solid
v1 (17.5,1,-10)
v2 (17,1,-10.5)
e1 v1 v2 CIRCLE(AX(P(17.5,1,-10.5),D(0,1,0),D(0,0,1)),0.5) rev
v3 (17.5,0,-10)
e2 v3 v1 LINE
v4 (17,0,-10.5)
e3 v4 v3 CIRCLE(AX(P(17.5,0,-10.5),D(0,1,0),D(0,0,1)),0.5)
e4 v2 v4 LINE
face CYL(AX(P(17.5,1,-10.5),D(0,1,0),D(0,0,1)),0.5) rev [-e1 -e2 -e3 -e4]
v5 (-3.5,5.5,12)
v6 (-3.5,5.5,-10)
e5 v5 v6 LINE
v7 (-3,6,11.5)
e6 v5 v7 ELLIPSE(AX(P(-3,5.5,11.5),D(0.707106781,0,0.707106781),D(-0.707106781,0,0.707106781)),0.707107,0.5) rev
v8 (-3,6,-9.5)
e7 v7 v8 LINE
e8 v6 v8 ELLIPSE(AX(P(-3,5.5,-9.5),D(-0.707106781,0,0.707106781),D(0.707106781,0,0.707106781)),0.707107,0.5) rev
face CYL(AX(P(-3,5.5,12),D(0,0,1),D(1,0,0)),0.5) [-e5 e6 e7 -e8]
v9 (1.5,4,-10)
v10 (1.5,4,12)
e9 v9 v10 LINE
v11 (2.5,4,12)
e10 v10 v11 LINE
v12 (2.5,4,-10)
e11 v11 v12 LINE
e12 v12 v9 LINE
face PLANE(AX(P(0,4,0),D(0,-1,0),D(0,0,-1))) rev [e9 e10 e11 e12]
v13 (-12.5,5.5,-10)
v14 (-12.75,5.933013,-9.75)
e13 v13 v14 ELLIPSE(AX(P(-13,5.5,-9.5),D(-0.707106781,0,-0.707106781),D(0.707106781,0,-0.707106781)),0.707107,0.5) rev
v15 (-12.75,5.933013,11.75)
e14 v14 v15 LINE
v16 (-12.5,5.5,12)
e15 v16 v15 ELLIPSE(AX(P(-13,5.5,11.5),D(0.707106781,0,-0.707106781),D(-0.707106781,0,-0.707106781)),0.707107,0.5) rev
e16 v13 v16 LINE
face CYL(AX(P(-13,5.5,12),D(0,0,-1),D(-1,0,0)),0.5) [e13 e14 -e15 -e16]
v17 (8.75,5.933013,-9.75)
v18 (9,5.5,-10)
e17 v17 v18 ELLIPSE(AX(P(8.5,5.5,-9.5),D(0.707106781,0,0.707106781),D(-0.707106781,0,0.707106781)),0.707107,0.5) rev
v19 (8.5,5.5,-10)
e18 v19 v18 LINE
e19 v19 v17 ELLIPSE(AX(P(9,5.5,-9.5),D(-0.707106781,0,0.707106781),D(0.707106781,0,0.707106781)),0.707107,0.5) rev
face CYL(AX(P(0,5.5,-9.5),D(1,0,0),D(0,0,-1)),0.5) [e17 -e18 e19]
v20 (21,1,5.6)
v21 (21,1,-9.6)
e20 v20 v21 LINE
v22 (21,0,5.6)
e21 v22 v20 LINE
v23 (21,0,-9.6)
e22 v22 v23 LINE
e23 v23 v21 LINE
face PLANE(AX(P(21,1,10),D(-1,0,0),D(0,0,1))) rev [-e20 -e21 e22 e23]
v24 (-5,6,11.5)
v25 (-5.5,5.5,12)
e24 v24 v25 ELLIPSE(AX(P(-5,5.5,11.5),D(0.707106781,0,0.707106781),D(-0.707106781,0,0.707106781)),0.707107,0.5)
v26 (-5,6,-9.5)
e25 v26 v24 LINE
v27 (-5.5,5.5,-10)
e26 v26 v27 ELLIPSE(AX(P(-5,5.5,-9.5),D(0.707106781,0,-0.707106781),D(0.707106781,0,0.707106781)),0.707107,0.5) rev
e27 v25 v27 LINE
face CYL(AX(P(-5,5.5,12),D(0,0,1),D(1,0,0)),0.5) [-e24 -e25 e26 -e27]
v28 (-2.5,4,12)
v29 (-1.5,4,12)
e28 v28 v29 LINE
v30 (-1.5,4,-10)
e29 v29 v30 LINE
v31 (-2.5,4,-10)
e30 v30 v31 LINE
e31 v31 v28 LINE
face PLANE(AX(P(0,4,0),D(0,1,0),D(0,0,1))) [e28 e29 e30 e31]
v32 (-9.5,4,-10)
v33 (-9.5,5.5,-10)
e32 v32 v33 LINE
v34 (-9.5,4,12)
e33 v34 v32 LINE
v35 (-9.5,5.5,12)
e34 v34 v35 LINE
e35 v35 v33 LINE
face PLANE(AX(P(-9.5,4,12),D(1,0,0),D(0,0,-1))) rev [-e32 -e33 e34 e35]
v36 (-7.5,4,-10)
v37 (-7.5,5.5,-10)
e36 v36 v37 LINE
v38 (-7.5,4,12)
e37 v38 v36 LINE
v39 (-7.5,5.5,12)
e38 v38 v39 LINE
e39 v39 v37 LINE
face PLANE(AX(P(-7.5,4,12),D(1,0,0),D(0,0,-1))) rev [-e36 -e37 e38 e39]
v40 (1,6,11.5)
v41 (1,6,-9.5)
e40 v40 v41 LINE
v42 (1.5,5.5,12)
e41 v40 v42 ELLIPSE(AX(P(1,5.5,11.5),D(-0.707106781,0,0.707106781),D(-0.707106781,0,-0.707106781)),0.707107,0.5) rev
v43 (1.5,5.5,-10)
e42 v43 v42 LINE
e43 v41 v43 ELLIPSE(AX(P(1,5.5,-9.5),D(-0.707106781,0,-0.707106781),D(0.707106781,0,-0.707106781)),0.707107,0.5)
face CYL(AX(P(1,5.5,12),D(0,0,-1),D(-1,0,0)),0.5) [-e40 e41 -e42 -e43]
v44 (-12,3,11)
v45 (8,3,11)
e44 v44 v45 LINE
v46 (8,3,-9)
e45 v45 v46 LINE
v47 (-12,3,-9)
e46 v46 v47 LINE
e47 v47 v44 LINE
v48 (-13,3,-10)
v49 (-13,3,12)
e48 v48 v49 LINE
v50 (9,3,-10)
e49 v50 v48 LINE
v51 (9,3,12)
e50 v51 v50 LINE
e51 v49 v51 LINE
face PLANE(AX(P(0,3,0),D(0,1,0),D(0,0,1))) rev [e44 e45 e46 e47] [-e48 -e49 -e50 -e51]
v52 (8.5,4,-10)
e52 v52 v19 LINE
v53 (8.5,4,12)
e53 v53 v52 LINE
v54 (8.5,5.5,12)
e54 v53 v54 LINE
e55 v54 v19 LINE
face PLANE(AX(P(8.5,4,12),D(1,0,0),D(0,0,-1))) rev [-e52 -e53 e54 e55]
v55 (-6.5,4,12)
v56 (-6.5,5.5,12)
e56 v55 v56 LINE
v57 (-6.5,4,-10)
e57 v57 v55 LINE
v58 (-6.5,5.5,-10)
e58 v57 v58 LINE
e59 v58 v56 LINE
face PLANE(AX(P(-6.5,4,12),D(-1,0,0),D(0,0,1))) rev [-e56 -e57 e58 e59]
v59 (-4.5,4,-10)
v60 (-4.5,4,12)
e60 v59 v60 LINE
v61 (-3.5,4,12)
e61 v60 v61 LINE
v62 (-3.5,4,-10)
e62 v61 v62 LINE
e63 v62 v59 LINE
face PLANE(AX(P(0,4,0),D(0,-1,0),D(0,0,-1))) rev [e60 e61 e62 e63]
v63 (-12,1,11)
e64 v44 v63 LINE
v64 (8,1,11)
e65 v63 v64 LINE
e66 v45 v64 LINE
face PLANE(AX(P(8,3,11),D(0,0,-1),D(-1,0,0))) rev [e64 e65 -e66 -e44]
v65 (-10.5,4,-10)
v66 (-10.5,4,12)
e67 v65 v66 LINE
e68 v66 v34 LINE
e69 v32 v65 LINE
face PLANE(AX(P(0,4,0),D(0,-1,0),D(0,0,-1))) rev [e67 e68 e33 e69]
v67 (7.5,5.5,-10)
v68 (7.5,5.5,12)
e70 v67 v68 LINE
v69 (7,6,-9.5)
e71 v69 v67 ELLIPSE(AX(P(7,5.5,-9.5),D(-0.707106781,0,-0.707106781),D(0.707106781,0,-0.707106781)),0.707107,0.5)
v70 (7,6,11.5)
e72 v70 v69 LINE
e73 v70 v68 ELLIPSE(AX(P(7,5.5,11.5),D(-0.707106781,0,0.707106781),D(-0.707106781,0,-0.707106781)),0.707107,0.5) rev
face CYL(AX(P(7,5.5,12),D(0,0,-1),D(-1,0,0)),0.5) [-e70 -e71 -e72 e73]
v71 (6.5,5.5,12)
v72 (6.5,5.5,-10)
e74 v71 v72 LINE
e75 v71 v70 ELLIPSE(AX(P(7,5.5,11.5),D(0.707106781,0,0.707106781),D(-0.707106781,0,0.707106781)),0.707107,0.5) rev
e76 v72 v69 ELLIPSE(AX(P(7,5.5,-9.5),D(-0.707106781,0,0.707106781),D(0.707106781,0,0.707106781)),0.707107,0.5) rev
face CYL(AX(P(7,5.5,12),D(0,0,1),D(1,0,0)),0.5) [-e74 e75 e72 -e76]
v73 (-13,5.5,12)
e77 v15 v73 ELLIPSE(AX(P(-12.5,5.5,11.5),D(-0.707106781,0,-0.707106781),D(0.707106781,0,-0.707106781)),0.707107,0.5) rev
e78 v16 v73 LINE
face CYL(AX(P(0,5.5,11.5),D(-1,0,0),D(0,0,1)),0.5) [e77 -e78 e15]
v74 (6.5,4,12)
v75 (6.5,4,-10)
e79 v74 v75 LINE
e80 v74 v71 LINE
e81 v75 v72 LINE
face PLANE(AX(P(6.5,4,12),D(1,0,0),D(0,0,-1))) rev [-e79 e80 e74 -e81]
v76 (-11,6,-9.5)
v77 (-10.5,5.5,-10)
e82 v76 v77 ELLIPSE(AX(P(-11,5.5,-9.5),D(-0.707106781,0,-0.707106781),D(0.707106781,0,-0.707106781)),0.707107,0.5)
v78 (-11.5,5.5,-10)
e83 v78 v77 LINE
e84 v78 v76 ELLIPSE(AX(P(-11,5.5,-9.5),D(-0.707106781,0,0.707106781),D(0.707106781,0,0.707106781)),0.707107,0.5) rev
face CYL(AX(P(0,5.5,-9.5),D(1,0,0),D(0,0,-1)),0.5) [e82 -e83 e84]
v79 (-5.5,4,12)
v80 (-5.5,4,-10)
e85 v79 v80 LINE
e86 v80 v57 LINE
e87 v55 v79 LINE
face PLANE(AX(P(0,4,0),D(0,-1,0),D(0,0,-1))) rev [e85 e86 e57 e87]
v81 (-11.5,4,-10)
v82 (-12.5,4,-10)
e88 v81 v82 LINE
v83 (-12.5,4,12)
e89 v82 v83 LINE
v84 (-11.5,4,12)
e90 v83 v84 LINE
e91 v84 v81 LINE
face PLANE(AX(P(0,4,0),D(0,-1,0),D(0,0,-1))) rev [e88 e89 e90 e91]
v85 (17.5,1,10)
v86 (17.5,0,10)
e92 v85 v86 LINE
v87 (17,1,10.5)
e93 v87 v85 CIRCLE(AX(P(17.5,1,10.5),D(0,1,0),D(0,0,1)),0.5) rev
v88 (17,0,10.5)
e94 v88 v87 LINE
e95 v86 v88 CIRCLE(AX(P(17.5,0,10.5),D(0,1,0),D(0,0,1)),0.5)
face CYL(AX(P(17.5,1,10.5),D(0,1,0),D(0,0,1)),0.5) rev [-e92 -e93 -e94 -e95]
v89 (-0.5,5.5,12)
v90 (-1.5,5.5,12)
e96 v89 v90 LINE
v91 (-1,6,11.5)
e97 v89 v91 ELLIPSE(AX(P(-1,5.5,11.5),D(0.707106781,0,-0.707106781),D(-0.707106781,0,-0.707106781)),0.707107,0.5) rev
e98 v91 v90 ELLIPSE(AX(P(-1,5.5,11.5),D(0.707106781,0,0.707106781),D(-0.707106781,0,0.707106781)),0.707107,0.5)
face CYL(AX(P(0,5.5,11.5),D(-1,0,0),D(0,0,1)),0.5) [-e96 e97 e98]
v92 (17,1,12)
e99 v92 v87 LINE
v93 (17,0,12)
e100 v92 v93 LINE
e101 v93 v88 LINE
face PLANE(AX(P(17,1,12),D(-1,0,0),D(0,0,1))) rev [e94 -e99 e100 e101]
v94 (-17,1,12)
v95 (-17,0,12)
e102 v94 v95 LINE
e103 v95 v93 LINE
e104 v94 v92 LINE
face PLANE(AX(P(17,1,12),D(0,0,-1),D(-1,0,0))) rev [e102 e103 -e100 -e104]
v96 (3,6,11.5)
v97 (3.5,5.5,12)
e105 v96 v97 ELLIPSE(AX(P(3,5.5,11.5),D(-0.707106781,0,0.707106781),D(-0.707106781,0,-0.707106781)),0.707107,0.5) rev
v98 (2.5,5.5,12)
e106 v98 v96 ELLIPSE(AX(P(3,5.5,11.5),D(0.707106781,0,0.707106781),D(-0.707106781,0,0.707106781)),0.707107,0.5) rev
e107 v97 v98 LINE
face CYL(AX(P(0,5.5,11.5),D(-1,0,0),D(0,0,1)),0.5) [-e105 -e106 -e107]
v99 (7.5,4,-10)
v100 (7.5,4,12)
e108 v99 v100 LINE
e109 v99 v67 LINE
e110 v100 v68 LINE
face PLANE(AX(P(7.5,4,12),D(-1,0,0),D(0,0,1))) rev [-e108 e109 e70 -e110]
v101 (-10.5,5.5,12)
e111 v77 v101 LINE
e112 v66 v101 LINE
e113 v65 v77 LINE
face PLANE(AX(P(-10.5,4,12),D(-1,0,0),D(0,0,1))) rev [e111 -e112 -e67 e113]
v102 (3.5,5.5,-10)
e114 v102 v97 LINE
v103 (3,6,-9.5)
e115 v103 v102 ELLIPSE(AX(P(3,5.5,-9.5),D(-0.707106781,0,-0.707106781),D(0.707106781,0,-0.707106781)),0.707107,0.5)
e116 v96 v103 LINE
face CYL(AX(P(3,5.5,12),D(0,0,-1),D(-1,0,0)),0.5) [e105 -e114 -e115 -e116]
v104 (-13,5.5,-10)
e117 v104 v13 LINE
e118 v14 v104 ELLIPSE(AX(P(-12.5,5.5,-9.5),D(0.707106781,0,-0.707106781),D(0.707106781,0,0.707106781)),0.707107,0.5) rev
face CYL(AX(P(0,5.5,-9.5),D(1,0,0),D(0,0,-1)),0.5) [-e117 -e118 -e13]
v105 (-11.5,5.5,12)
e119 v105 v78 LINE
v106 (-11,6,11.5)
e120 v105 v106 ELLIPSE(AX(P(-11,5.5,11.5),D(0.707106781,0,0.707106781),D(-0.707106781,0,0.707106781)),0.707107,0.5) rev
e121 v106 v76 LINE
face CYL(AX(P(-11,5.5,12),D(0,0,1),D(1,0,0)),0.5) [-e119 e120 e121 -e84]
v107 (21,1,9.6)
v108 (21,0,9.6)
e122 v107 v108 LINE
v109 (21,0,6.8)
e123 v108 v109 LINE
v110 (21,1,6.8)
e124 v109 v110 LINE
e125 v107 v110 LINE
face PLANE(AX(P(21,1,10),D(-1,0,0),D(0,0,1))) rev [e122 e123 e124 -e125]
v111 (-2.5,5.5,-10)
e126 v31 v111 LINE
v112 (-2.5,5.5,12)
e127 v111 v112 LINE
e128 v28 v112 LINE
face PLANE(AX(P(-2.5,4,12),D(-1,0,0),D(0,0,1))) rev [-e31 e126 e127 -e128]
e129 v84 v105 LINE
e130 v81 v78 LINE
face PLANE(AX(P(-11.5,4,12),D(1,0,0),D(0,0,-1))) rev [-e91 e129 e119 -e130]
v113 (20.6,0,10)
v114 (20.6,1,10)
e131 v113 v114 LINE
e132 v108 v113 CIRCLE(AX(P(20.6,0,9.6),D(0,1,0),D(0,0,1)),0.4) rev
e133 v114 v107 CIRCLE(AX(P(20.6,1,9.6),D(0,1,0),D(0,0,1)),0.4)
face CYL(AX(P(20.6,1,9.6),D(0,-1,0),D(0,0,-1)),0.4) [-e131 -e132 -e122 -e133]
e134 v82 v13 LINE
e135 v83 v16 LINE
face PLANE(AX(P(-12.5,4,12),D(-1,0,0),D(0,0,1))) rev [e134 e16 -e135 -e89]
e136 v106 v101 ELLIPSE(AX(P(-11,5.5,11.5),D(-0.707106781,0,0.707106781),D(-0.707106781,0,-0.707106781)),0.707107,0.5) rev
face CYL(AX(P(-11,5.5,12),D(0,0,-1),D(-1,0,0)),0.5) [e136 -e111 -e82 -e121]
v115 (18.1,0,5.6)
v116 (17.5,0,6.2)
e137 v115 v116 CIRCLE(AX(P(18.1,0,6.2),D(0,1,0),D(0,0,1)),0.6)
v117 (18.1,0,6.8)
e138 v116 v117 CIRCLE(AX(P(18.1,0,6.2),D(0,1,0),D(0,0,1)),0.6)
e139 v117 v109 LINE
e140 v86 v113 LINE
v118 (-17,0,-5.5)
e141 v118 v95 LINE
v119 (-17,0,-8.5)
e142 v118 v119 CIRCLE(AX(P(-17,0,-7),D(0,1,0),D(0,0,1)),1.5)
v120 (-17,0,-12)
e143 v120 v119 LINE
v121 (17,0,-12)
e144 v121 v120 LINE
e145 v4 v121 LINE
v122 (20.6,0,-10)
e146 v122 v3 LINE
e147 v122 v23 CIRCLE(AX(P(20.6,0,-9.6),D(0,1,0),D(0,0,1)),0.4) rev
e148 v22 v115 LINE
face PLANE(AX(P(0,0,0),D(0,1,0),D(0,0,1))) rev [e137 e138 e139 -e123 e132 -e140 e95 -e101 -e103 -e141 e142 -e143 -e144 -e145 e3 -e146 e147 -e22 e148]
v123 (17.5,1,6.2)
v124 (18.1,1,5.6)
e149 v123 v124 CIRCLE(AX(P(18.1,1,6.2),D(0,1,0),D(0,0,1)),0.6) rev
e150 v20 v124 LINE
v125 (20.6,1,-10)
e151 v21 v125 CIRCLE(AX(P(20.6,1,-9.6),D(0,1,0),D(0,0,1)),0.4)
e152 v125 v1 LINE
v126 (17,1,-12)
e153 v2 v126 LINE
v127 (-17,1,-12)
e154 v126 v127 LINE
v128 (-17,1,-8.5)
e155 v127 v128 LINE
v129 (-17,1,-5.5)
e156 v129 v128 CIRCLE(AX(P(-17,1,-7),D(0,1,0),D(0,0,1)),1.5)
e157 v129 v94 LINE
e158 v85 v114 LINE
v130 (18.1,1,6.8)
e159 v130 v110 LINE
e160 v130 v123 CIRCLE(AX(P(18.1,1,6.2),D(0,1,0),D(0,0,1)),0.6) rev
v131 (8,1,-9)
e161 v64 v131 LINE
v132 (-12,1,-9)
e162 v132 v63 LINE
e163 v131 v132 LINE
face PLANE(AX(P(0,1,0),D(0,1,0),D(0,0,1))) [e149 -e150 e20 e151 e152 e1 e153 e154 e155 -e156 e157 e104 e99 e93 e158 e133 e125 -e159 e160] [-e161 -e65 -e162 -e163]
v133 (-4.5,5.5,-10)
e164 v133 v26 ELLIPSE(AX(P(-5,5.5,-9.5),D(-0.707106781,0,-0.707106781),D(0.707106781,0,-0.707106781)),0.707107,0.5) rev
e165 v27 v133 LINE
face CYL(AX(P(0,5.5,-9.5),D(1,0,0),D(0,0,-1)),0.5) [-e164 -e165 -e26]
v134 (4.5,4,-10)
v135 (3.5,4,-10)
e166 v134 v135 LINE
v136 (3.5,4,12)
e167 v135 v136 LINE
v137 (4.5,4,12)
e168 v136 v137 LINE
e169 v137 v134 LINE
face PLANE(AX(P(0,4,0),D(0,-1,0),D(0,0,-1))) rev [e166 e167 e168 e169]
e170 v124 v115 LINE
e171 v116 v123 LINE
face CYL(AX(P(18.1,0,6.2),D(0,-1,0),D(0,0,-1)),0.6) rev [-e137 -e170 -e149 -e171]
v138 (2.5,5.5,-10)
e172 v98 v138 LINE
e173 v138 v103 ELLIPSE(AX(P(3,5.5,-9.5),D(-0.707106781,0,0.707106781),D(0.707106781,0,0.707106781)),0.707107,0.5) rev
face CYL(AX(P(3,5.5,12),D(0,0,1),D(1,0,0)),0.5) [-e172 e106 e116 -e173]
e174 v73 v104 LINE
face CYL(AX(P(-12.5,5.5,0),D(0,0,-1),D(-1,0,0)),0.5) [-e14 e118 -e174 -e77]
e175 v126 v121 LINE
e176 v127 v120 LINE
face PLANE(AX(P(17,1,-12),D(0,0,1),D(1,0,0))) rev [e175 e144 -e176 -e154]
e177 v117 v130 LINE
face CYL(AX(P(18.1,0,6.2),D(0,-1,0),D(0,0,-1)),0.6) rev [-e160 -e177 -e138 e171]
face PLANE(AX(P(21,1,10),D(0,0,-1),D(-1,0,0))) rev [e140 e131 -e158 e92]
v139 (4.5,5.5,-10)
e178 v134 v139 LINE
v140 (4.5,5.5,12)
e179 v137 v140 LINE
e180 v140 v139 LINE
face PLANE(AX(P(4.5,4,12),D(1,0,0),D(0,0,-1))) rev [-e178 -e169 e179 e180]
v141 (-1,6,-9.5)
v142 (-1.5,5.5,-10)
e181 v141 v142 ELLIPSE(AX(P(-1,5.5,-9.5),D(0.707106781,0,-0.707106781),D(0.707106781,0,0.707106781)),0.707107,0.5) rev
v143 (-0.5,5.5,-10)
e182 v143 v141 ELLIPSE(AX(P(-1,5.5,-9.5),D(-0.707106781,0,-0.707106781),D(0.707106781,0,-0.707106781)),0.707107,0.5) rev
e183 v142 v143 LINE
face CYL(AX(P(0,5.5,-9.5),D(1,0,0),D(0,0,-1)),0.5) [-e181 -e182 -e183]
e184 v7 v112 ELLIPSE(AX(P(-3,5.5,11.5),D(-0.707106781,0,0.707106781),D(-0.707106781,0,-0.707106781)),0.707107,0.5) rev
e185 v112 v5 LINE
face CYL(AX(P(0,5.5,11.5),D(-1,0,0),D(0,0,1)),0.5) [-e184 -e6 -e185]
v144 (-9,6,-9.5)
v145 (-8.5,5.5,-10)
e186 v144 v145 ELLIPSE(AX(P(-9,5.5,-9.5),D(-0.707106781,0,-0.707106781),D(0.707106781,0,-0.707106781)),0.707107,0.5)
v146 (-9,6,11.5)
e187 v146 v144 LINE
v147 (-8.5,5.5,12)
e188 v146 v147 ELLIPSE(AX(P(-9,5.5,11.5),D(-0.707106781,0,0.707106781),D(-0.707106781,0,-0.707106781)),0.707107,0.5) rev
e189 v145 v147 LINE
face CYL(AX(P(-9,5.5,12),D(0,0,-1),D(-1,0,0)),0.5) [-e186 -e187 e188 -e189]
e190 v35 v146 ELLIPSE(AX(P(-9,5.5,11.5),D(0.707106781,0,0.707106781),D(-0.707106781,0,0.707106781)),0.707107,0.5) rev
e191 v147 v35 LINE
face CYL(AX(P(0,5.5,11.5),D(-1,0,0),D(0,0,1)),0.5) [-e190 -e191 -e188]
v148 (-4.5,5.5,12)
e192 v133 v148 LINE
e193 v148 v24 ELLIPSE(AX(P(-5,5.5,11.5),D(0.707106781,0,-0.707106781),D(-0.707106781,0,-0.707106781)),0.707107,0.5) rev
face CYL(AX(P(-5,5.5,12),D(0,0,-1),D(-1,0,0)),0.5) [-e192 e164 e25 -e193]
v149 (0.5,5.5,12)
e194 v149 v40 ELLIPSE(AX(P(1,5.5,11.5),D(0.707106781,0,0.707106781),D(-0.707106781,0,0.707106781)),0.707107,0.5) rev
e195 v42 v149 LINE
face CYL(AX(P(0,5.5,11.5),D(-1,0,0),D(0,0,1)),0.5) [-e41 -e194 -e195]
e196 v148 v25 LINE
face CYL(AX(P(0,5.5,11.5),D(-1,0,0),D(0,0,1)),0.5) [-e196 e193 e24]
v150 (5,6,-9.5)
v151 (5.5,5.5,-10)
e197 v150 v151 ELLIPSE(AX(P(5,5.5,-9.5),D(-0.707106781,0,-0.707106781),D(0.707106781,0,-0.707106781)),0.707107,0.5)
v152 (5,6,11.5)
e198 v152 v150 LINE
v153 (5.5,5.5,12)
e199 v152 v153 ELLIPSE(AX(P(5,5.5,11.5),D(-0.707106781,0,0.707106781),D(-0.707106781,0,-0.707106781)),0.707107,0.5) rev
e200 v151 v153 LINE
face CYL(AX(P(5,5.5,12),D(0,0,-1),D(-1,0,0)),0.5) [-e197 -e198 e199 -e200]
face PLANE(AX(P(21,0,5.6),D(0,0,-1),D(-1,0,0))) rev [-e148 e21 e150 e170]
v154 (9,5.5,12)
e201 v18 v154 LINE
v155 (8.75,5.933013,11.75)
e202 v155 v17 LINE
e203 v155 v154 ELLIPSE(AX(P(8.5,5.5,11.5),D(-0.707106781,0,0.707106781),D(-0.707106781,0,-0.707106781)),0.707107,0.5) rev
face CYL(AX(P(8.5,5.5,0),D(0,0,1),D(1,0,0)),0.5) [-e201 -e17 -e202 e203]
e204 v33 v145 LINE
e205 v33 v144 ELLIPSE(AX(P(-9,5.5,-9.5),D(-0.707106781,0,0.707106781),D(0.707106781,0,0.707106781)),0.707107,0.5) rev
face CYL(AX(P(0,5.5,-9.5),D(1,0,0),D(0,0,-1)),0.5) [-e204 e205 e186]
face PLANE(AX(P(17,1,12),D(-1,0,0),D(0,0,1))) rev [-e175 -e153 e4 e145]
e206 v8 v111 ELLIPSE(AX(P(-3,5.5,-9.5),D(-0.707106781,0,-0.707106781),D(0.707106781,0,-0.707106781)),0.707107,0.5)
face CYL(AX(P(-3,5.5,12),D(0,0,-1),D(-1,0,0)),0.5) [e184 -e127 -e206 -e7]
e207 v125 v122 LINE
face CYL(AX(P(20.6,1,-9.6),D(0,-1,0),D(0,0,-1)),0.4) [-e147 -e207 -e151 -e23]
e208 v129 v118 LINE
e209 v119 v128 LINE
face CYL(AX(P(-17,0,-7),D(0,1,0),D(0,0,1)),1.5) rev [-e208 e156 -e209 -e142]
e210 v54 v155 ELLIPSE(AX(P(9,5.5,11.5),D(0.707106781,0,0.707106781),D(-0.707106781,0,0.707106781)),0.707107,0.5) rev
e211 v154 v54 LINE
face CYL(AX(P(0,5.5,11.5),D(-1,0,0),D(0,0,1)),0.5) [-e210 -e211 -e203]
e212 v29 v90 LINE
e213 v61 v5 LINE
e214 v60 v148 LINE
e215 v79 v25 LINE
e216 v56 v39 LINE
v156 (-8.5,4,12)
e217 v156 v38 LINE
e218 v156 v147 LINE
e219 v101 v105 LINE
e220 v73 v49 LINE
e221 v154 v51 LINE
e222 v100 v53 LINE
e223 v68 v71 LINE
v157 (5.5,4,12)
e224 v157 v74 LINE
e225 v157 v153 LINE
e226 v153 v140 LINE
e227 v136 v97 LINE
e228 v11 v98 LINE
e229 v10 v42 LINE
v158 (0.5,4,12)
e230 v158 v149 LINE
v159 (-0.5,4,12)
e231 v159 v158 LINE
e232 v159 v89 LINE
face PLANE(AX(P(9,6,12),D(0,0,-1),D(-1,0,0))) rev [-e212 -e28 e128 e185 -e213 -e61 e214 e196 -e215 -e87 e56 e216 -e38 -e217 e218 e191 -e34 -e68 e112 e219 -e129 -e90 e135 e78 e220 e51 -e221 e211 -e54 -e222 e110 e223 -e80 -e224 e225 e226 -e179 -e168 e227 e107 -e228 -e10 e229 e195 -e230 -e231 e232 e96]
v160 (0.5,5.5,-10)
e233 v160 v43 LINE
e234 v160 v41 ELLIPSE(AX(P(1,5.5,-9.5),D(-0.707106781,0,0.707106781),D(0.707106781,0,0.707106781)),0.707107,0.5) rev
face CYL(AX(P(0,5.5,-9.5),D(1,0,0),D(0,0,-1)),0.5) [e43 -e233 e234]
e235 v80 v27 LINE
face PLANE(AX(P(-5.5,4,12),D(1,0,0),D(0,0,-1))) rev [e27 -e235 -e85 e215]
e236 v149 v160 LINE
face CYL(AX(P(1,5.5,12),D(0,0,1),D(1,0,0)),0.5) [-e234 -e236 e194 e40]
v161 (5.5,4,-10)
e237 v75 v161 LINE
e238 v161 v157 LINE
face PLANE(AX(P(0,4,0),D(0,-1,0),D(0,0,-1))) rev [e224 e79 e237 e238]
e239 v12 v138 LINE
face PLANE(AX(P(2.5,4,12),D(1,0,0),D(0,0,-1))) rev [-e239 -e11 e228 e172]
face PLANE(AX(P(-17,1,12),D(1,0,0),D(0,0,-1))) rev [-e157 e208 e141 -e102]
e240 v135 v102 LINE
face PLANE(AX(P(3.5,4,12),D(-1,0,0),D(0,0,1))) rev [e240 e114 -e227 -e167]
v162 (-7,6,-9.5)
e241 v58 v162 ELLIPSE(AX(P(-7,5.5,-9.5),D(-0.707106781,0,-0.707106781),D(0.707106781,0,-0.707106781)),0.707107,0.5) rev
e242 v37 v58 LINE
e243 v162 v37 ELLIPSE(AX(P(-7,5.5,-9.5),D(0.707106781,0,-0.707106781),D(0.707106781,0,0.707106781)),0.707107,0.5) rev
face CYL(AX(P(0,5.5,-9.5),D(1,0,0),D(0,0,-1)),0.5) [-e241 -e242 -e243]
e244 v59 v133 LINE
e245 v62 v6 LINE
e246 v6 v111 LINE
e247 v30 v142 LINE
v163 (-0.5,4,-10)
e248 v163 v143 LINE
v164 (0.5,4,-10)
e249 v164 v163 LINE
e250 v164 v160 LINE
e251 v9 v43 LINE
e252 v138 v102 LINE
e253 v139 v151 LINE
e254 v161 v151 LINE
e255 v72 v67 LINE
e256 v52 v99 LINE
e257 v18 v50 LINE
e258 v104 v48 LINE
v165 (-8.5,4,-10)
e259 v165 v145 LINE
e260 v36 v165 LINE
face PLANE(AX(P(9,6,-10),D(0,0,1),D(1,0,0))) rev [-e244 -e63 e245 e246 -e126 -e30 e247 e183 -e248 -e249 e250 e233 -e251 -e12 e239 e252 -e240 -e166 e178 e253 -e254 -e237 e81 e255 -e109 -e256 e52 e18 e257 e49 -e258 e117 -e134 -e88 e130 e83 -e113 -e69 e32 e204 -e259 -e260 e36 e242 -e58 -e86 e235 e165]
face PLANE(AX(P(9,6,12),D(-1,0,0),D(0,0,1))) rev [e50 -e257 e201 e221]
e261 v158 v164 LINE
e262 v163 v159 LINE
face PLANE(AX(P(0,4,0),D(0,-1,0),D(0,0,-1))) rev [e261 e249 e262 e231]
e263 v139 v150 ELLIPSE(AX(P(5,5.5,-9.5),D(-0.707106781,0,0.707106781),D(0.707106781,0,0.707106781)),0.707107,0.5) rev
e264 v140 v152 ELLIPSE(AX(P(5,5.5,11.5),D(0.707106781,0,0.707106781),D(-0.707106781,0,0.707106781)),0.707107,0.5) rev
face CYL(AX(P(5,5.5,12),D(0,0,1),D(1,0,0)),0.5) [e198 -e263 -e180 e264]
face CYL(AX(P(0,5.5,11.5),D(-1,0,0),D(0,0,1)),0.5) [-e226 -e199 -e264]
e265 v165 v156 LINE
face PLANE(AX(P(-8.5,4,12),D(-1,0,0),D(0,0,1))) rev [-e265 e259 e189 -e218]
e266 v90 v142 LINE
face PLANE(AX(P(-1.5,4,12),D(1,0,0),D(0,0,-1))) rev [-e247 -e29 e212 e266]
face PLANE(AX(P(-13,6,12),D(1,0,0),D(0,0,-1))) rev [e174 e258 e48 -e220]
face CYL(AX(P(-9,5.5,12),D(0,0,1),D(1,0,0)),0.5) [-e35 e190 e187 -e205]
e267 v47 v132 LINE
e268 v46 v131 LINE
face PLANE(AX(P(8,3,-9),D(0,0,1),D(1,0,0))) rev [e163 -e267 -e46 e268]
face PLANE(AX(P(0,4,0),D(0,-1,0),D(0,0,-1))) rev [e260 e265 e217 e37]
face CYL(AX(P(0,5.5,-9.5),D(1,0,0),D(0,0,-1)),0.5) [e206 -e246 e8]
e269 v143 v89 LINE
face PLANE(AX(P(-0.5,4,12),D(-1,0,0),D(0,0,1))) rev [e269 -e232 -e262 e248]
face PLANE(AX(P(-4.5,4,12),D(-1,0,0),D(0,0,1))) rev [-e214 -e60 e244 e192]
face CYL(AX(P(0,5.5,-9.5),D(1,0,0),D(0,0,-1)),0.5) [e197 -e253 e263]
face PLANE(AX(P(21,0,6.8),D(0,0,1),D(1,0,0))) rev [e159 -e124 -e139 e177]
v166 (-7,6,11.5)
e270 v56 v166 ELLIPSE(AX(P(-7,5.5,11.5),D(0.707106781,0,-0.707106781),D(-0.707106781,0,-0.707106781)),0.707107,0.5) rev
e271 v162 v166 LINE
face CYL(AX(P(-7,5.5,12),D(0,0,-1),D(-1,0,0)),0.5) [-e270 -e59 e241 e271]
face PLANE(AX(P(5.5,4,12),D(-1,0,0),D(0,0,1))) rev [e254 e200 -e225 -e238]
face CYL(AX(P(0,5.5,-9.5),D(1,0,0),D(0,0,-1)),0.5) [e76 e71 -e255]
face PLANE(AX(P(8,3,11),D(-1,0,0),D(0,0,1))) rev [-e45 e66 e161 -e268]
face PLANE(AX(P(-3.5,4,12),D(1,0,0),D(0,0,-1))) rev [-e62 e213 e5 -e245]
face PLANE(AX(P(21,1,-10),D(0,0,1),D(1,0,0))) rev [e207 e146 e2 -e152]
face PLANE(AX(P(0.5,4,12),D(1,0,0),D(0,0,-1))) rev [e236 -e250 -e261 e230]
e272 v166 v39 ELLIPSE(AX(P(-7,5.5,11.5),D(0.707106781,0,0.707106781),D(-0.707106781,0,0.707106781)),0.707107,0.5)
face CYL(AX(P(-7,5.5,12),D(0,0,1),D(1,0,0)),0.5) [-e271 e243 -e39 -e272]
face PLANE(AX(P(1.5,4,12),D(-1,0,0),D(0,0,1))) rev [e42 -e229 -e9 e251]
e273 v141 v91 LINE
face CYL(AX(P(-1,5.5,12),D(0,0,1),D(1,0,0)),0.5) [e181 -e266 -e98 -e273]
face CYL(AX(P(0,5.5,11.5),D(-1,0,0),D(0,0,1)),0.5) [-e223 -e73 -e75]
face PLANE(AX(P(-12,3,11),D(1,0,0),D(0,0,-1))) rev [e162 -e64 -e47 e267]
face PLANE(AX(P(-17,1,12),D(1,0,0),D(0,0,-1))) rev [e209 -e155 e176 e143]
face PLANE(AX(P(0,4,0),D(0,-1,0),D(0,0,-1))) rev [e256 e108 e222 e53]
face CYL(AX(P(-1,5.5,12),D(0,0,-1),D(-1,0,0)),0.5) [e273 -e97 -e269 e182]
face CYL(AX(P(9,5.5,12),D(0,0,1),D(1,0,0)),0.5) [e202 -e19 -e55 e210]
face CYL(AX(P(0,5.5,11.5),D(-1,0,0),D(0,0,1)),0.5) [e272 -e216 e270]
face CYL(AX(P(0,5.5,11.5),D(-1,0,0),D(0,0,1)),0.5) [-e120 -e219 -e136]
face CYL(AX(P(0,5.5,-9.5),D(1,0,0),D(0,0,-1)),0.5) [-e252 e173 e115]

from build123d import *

# Parameters (mm, degrees)
SKETCH_1_W          = 34
SKETCH_1_H          = 24
EXTRUDE_1_DEPTH     = 1
SKETCH_2_W          = 4
SKETCH_2_H          = 20
EXTRUDE_2_DEPTH     = 1
SKETCH_3_W          = 3.5
SKETCH_3_H          = 1.2
CUT_EXTRUDE_1_DEPTH = 25.207436874
FILLET_1_R          = 0.6
FILLET_2_R          = 0.5
FILLET_3_R          = 0.4
SKETCH_4_R          = 1.5
CUT_EXTRUDE_2_DEPTH = 25.207436874
SKETCH_8_W          = 20
SKETCH_8_H          = 20
EXTRUDE_9_DEPTH     = 2
SKETCH_5_W          = 22
SKETCH_5_H          = 22
EXTRUDE_3_DEPTH     = 3
SKETCH_6_W          = 1
SKETCH_6_H          = 22
CUT_EXTRUDE_3_DEPTH = 2
FILLET_4_R          = 0.5


# Some blends are built 0.0001 mm under size
with BuildPart() as part:
    # 草图1 → 凸台-拉伸1 (new body)
    with BuildSketch(Plane(origin=(0, 0, 0), x_dir=(1, 0, 0), z_dir=(0, 1, 0))):
        Rectangle(SKETCH_1_W, SKETCH_1_H)
    extrude(amount=EXTRUDE_1_DEPTH)

    # 草图2 → 凸台-拉伸2 (add)
    with BuildSketch(Plane(origin=(0, 0, 0), x_dir=(1, 0, 0), z_dir=(0, 1, 0))):
        with Locations((19, 0)):
            Rectangle(SKETCH_2_W, SKETCH_2_H)
    extrude(amount=EXTRUDE_2_DEPTH)

    # 草图3 → 切除-拉伸1 (cut, through all)
    with BuildSketch(Plane(origin=(0, 1, 0), x_dir=(1, 0, 0), z_dir=(0, 1, 0))):
        with Locations((19.25, -6.2)):
            Rectangle(SKETCH_3_W, SKETCH_3_H)
    extrude(amount=-CUT_EXTRUDE_1_DEPTH, mode=Mode.SUBTRACT)

    # 圆角1
    fillet_1_edges = [part.edges().sort_by_distance(p)[0] for p in [
        (17.5, 0.5, 6.8),
        (17.5, 0.5, 5.6),
    ]]
    fillet(fillet_1_edges, radius=FILLET_1_R - 0.0001)  # a hair under: the kernel refuses the full size

    # 圆角2
    fillet_2_edges = [part.edges().sort_by_distance(p)[0] for p in [
        (17, 0.5, -10),
        (17, 0.5, 10),
    ]]
    fillet(fillet_2_edges, radius=FILLET_2_R)

    # 圆角3
    fillet_3_edges = [part.edges().sort_by_distance(p)[0] for p in [
        (21, 0.5, 10),
        (21, 0.5, -10),
    ]]
    fillet(fillet_3_edges, radius=FILLET_3_R)

    # 草图4 → 切除-拉伸2 (cut, through all)
    with BuildSketch(Plane(origin=(0, 1, 0), x_dir=(1, 0, 0), z_dir=(0, 1, 0))):
        with Locations((-17, 7)):
            Circle(SKETCH_4_R)
    extrude(amount=-CUT_EXTRUDE_2_DEPTH, mode=Mode.SUBTRACT)

    # 草图8 → 凸台-拉伸9 (add)
    with BuildSketch(Plane(origin=(0, 1, 0), x_dir=(1, 0, 0), z_dir=(0, 1, 0))):
        with Locations((-2, -1)):
            Rectangle(SKETCH_8_W, SKETCH_8_H)
    extrude(amount=EXTRUDE_9_DEPTH)

    # 草图5 → 凸台-拉伸3 (add)
    with BuildSketch(Plane(origin=(0, 3, 0), x_dir=(1, 0, 0), z_dir=(0, 1, 0))):
        with Locations((-2, -1)):
            Rectangle(SKETCH_5_W, SKETCH_5_H)
    extrude(amount=EXTRUDE_3_DEPTH)

    # 草图6 → 切除-拉伸3 (cut)
    with BuildSketch(Plane(origin=(0, 6, 0), x_dir=(1, 0, 0), z_dir=(0, 1, 0))):
        with Locations((-2, -1)):
            Rectangle(SKETCH_6_W, SKETCH_6_H)
        with Locations((0, -1)):
            Rectangle(SKETCH_6_W, SKETCH_6_H)
        with Locations((2, -1)):
            Rectangle(SKETCH_6_W, SKETCH_6_H)
        with Locations((4, -1)):
            Rectangle(SKETCH_6_W, SKETCH_6_H)
        with Locations((6, -1)):
            Rectangle(SKETCH_6_W, SKETCH_6_H)
        with Locations((8, -1)):
            Rectangle(SKETCH_6_W, SKETCH_6_H)
        with Locations((-4, -1)):
            Rectangle(SKETCH_6_W, SKETCH_6_H)
        with Locations((-6, -1)):
            Rectangle(SKETCH_6_W, SKETCH_6_H)
        with Locations((-8, -1)):
            Rectangle(SKETCH_6_W, SKETCH_6_H)
        with Locations((-10, -1)):
            Rectangle(SKETCH_6_W, SKETCH_6_H)
        with Locations((-12, -1)):
            Rectangle(SKETCH_6_W, SKETCH_6_H)
    extrude(amount=-CUT_EXTRUDE_3_DEPTH, mode=Mode.SUBTRACT)

    # 圆角4
    # the kernel refuses this fillet: 0.5 mm, written as the material it takes off along each edge
    with BuildSketch(Plane(origin=(-13, 6, 13.25), x_dir=(0, -1, 0), z_dir=(0, 0, -1)), Plane(origin=(-11.5, 6, 13.25), x_dir=(0, -1, 0), z_dir=(0, 0, -1)), Plane(origin=(-9.5, 6, 13.25), x_dir=(0, -1, 0), z_dir=(0, 0, -1)), Plane(origin=(0.5, 6, 13.25), x_dir=(0, -1, 0), z_dir=(0, 0, -1)), Plane(origin=(2.5, 6, 13.25), x_dir=(0, -1, 0), z_dir=(0, 0, -1)), Plane(origin=(4.5, 6, 13.25), x_dir=(0, -1, 0), z_dir=(0, 0, -1)), Plane(origin=(6.5, 6, 13.25), x_dir=(0, -1, 0), z_dir=(0, 0, -1)), Plane(origin=(8.5, 6, 13.25), x_dir=(0, -1, 0), z_dir=(0, 0, -1)), Plane(origin=(-3.5, 6, 13.25), x_dir=(0, -1, 0), z_dir=(0, 0, -1)), Plane(origin=(-5.5, 6, 13.25), x_dir=(0, -1, 0), z_dir=(0, 0, -1)), Plane(origin=(-7.5, 6, 13.25), x_dir=(0, -1, 0), z_dir=(0, 0, -1)), Plane(origin=(-2.5, 6, 13.25), x_dir=(-1, 0, 0), z_dir=(0, 0, -1))) as fillet_4_piece_1:
        with BuildLine():
            CenterArc((FILLET_4_R, -FILLET_4_R), FILLET_4_R, 90, 90)
            Line((0, -FILLET_4_R), (0, 0))
            Line((0, 0), (FILLET_4_R, 0))
        make_face()
    extrude(amount=24.5, mode=Mode.SUBTRACT)
    with BuildSketch(Plane(origin=(-11.25, 6, 12), x_dir=(0, -1, 0), z_dir=(-1, 0, 0)), Plane(origin=(10.25, 6, 12), x_dir=(0, -1, 0), z_dir=(-1, 0, 0))) as fillet_4_piece_2:
        with BuildLine():
            CenterArc((FILLET_4_R, -FILLET_4_R), FILLET_4_R, 90, 90)
            Line((0, -FILLET_4_R), (0, 0))
            Line((0, 0), (FILLET_4_R, 0))
        make_face()
    extrude(amount=3, mode=Mode.SUBTRACT)
    with BuildSketch(Plane(origin=(9, 6, -11.25), x_dir=(-1, 0, 0), z_dir=(0, 0, 1)), Plane(origin=(-12.5, 6, -11.25), x_dir=(-1, 0, 0), z_dir=(0, 0, 1)), Plane(origin=(-10.5, 6, -11.25), x_dir=(-1, 0, 0), z_dir=(0, 0, 1)), Plane(origin=(-0.5, 6, -11.25), x_dir=(-1, 0, 0), z_dir=(0, 0, 1)), Plane(origin=(1.5, 6, -11.25), x_dir=(-1, 0, 0), z_dir=(0, 0, 1)), Plane(origin=(3.5, 6, -11.25), x_dir=(-1, 0, 0), z_dir=(0, 0, 1)), Plane(origin=(5.5, 6, -11.25), x_dir=(-1, 0, 0), z_dir=(0, 0, 1)), Plane(origin=(7.5, 6, -11.25), x_dir=(-1, 0, 0), z_dir=(0, 0, 1)), Plane(origin=(-4.5, 6, -11.25), x_dir=(-1, 0, 0), z_dir=(0, 0, 1)), Plane(origin=(-6.5, 6, -11.25), x_dir=(-1, 0, 0), z_dir=(0, 0, 1)), Plane(origin=(-8.5, 6, -11.25), x_dir=(-1, 0, 0), z_dir=(0, 0, 1)), Plane(origin=(-1.5, 6, -11.25), x_dir=(0, -1, 0), z_dir=(0, 0, 1))) as fillet_4_piece_3:
        with BuildLine():
            CenterArc((FILLET_4_R, FILLET_4_R), FILLET_4_R, 180, 90)
            Line((0, FILLET_4_R), (0, 0))
            Line((0, 0), (FILLET_4_R, 0))
        make_face()
    extrude(amount=24.5, mode=Mode.SUBTRACT)
    with BuildSketch(Plane(origin=(7.25, 6, -10), x_dir=(0, 0, 1), z_dir=(1, 0, 0)), Plane(origin=(-14.25, 6, -10), x_dir=(0, 0, 1), z_dir=(1, 0, 0))) as fillet_4_piece_4:
        with BuildLine():
            CenterArc((FILLET_4_R, FILLET_4_R), FILLET_4_R, 180, 90)
            Line((0, FILLET_4_R), (0, 0))
            Line((0, 0), (FILLET_4_R, 0))
        make_face()
    extrude(amount=3, mode=Mode.SUBTRACT)
    with BuildSketch(Plane(origin=(-9.25, 6, 12), x_dir=(0, -1, 0), z_dir=(-1, 0, 0)), Plane(origin=(-7.25, 6, 12), x_dir=(0, -1, 0), z_dir=(-1, 0, 0)), Plane(origin=(-5.25, 6, 12), x_dir=(0, -1, 0), z_dir=(-1, 0, 0)), Plane(origin=(-3.25, 6, 12), x_dir=(0, -1, 0), z_dir=(-1, 0, 0)), Plane(origin=(-1.25, 6, 12), x_dir=(0, -1, 0), z_dir=(-1, 0, 0)), Plane(origin=(0.75, 6, 12), x_dir=(0, -1, 0), z_dir=(-1, 0, 0)), Plane(origin=(2.75, 6, 12), x_dir=(0, -1, 0), z_dir=(-1, 0, 0)), Plane(origin=(4.75, 6, 12), x_dir=(0, -1, 0), z_dir=(-1, 0, 0)), Plane(origin=(6.75, 6, 12), x_dir=(0, -1, 0), z_dir=(-1, 0, 0)), Plane(origin=(8.75, 6, 12), x_dir=(0, -1, 0), z_dir=(-1, 0, 0))) as fillet_4_piece_5:
        with BuildLine():
            CenterArc((FILLET_4_R, -FILLET_4_R), FILLET_4_R, 90, 90)
            Line((0, -FILLET_4_R), (0, 0))
            Line((0, 0), (FILLET_4_R, 0))
        make_face()
    extrude(amount=3.5, mode=Mode.SUBTRACT)
    with BuildSketch(Plane(origin=(5.25, 6, -10), x_dir=(0, 0, 1), z_dir=(1, 0, 0)), Plane(origin=(3.25, 6, -10), x_dir=(0, 0, 1), z_dir=(1, 0, 0)), Plane(origin=(1.25, 6, -10), x_dir=(0, 0, 1), z_dir=(1, 0, 0)), Plane(origin=(-0.75, 6, -10), x_dir=(0, 0, 1), z_dir=(1, 0, 0)), Plane(origin=(-2.75, 6, -10), x_dir=(0, 0, 1), z_dir=(1, 0, 0)), Plane(origin=(-4.75, 6, -10), x_dir=(0, 0, 1), z_dir=(1, 0, 0)), Plane(origin=(-6.75, 6, -10), x_dir=(0, 0, 1), z_dir=(1, 0, 0)), Plane(origin=(-8.75, 6, -10), x_dir=(0, 0, 1), z_dir=(1, 0, 0)), Plane(origin=(-10.75, 6, -10), x_dir=(0, 0, 1), z_dir=(1, 0, 0)), Plane(origin=(-12.75, 6, -10), x_dir=(0, 0, 1), z_dir=(1, 0, 0))) as fillet_4_piece_6:
        with BuildLine():
            CenterArc((FILLET_4_R, FILLET_4_R), FILLET_4_R, 180, 90)
            Line((0, FILLET_4_R), (0, 0))
            Line((0, 0), (FILLET_4_R, 0))
        make_face()
    extrude(amount=3.5, mode=Mode.SUBTRACT)


solid = part.part
